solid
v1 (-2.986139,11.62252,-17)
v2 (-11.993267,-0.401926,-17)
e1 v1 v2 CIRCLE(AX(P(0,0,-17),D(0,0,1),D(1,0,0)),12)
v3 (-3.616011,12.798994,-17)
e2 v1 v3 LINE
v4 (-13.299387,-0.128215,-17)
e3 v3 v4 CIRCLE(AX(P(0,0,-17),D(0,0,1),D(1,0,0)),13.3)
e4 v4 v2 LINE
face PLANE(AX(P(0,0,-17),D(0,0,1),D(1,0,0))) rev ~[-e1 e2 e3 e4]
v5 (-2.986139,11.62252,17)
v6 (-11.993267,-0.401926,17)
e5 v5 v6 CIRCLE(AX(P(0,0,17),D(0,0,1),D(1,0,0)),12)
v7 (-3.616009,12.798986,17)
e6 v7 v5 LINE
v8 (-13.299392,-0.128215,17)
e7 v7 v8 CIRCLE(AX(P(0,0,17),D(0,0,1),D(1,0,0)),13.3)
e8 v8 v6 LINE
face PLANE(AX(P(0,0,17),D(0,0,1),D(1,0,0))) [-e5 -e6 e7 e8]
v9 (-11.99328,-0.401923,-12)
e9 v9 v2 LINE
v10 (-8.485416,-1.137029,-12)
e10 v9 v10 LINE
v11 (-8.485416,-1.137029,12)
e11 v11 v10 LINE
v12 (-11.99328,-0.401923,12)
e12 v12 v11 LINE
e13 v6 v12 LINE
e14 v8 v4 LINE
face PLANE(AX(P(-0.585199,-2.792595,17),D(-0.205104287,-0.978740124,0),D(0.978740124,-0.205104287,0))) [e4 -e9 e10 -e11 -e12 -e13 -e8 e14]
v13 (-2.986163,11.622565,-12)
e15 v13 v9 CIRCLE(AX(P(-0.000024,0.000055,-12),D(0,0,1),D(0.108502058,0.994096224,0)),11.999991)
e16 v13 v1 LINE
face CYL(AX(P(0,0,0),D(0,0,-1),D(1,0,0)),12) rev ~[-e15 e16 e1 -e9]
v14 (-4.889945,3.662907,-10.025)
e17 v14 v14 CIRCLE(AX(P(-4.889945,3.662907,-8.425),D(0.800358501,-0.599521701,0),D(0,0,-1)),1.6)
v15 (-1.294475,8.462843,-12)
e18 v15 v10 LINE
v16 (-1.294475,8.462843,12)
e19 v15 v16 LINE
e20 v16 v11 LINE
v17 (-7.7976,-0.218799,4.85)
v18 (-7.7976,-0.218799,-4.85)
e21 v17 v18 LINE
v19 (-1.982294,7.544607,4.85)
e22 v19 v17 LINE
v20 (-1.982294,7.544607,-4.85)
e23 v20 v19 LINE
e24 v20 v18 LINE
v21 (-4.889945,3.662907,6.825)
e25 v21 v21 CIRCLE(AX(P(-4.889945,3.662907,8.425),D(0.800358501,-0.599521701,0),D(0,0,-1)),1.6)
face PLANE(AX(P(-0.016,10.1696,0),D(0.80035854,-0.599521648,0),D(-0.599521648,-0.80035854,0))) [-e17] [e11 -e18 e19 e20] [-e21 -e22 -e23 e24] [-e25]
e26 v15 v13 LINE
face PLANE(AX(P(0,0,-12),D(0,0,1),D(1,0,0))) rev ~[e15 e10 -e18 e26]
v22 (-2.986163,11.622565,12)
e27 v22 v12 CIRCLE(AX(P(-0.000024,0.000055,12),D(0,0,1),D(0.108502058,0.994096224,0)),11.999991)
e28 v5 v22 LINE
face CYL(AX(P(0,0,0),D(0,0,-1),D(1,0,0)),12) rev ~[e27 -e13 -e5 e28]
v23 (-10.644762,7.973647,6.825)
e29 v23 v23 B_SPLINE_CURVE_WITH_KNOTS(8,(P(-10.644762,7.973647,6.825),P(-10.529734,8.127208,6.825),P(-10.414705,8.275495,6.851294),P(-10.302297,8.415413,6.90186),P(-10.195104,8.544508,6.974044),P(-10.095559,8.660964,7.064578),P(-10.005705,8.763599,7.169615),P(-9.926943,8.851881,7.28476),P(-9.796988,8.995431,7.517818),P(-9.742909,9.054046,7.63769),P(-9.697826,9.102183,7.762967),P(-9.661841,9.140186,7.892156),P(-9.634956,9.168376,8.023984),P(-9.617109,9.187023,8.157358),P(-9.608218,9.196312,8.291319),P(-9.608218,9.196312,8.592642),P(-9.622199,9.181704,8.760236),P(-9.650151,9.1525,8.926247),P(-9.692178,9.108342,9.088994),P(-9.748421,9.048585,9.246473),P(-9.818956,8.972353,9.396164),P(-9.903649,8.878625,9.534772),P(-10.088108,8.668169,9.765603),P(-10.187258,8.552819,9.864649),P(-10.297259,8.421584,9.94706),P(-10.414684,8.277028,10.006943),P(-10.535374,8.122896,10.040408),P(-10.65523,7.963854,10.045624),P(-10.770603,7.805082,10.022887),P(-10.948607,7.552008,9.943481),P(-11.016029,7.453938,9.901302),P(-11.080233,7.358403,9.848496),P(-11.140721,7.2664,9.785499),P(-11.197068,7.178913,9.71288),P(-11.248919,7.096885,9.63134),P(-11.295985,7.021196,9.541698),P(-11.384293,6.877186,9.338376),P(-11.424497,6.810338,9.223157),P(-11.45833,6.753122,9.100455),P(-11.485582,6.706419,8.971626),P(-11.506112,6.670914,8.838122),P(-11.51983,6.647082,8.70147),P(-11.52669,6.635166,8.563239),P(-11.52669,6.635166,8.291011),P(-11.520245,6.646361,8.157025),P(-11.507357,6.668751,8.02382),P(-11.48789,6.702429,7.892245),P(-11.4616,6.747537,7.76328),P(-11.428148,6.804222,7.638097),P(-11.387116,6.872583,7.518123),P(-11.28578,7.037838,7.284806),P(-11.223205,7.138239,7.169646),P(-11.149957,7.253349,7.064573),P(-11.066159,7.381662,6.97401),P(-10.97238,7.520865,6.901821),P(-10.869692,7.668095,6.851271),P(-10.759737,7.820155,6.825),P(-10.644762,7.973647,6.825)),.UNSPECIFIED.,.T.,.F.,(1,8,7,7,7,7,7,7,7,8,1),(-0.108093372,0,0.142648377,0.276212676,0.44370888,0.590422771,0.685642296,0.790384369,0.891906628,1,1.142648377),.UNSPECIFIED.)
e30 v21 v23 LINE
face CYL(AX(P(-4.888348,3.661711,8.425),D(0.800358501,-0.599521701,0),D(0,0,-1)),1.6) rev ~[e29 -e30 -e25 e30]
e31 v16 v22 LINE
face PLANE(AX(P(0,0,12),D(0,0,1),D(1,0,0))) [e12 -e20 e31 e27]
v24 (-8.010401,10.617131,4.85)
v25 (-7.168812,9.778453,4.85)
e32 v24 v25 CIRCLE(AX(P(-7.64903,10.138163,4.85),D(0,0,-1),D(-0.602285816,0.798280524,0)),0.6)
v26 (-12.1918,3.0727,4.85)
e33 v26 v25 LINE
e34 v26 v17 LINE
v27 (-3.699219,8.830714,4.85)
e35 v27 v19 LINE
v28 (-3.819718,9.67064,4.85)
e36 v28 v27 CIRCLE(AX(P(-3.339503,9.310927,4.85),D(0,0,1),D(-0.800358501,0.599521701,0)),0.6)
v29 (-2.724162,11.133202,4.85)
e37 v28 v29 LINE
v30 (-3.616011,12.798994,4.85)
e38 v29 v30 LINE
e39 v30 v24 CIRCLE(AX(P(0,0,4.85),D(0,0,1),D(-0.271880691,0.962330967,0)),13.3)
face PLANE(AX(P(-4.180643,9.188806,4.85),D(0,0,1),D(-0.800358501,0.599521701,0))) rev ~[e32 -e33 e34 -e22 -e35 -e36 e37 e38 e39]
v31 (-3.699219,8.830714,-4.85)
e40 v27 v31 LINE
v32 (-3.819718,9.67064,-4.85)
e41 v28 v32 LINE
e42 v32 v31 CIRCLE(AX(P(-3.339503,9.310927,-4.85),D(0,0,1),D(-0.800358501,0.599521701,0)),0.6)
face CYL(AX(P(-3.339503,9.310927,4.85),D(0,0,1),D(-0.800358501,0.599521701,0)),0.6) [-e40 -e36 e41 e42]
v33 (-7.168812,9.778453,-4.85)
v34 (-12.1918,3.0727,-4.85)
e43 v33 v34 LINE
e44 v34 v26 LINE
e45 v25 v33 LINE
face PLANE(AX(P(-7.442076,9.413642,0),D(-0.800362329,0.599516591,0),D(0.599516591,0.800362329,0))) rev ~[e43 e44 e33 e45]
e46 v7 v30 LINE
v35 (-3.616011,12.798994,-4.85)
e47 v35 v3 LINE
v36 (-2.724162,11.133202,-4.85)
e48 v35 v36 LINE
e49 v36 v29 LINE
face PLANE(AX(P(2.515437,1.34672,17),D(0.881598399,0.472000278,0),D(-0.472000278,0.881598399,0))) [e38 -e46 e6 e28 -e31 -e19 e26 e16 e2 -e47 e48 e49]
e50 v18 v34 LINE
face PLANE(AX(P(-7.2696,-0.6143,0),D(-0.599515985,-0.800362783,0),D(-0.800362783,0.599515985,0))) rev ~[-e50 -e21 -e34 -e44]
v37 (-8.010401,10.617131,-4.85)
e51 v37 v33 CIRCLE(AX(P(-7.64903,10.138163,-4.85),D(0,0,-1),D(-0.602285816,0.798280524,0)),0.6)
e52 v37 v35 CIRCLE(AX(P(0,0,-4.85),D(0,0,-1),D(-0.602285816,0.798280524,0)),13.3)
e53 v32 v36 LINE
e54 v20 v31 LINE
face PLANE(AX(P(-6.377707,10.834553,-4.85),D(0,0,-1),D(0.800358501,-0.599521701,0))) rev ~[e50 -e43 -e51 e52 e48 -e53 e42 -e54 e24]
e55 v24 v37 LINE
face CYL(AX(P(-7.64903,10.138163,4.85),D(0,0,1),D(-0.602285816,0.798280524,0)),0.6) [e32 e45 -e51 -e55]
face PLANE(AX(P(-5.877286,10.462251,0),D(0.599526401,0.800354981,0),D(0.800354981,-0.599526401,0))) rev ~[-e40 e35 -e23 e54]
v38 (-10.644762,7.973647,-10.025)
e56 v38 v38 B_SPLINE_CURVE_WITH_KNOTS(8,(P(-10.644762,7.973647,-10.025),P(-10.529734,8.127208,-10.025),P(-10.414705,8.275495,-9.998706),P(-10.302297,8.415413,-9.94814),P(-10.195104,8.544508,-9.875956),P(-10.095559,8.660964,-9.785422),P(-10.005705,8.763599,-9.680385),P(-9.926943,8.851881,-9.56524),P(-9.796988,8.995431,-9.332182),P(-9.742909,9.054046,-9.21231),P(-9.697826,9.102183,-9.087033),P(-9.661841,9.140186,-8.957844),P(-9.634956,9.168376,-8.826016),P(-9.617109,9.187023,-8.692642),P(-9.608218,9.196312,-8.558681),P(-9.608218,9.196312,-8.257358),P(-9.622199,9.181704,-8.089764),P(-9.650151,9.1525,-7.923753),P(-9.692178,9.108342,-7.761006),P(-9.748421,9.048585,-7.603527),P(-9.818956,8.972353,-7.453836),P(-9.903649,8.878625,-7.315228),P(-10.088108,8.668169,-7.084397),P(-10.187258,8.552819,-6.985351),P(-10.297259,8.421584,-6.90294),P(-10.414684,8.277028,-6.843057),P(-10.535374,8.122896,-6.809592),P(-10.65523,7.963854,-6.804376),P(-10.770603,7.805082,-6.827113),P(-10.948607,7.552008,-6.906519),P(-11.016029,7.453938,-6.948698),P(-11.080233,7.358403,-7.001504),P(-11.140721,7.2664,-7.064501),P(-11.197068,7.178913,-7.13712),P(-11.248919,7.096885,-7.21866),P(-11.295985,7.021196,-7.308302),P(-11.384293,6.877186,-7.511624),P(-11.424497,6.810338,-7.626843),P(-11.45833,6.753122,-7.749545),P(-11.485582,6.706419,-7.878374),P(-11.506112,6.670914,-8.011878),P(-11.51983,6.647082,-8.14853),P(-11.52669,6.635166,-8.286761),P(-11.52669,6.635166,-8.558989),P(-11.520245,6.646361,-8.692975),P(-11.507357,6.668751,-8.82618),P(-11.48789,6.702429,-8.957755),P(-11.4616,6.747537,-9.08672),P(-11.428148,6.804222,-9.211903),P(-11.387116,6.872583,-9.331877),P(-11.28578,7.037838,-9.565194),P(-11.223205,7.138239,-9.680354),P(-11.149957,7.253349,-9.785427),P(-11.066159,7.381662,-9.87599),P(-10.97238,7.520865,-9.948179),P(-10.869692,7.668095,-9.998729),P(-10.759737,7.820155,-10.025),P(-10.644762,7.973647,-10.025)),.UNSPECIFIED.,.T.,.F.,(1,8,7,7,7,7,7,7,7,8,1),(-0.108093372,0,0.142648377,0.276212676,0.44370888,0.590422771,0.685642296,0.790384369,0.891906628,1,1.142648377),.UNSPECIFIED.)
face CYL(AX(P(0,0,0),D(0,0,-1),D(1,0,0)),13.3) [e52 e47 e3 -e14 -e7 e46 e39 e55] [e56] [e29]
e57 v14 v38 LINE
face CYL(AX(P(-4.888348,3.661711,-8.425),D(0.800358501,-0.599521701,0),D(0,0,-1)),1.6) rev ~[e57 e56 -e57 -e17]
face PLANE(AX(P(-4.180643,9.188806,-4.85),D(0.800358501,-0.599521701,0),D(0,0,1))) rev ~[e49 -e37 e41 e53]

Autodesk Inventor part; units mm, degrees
ref_plane "YZ Plane" through (0, 0, 0) normal (1, 0, 0) x (0, 1, 0)
ref_plane "XZ Plane" through (0, 0, 0) normal (0, 1, 0) x (-1, 0, 0)
ref_plane "XY Plane" through (0, 0, 0) normal (0, 0, 1) x (1, 0, 0)
sketch "Эскиз1" plane through (0, 0, 0) normal (0, 0, 1) x (1, 0, 0)
  arc A0 (-0.8919, 11.7662) -> (-11.5424, -2.4521) centre (0, 0) ccw projected
  line L0 (-0.016, 10.1696) -> (-9.7639, -2.8438) projected
  line L1 (-9.7639, -2.8438) -> (-12.4663, -6.4515) projected
  arc A1 (-0.8919, 11.7662) -> (-11.5424, -2.4521) centre (0, 0) ccw projected
  line L2 (2.8533, 14) -> (-0.016, 10.1696) projected
  arc A2 (-8.5159, 10.4752) -> (-12.3517, -5.4484) centre (0, 0) ccw projected
  circle A3 centre (0, 0) radius 13.5
  circle A4 centre (0, 0) radius 11.8
  circle A5 centre (0, 0) radius 13.3
  circle A6 centre (0, 0) radius 12
  line L3 (-8.1467, 14) -> (2.8533, 14) projected
  line L4 (-8.1467, 14) -> (-8.1467, 11.2511) projected
  arc A7 (-11.5424, -2.4521) -> (-9.7639, -2.8438) centre (-10.5642, -2.2443) ccw projected
  arc A8 (-0.016, 10.1696) -> (-0.8919, 11.7662) centre (-0.8163, 10.7691) ccw projected
  arc A9 (-8.5159, 10.4752) -> (-8.1467, 11.2511) centre (-9.1467, 11.2511) ccw projected
  arc A10 (-12.4663, -6.4515) -> (-12.3517, -5.4484) centre (-13.2667, -5.852) ccw projected
  arc A11 (-11.5424, -2.4521) -> (-9.7639, -2.8438) centre (-10.5642, -2.2443) ccw projected
  arc A12 (-0.016, 10.1696) -> (-0.8919, 11.7662) centre (-0.8163, 10.7691) ccw projected
  point P0 (1.1623, 11.7426)
  point P1 (2.3273, 13.2979)
  point P2 (-11.0819, -4.6034)
  point P3 (1.302, 11.9292)
  point P4 (2.1926, 13.118)
  point P5 (-11.9725, -5.7923)
  dimension "d1" = 0.2
  dimension "d2" = 0.2
extrude "Выдавливание1" add sketch "Эскиз1" along normal mid plane 34 contours A6 L1 A5 L2 picked at (-9.9488, 8.0267)
sketch "Эскиз2" plane through (0, 0, 0) normal (0, 0, 1) x (1, 0, 0)
  arc A0 (-0.8919, 11.7662) -> (-11.5424, -2.4521) centre (0, 0) ccw projected
  line L0 (-0.016, 10.1696) -> (-9.7639, -2.8438) projected
  arc A1 (1.302, 11.9292) -> (-11.0819, -4.6034) centre (0, 0) ccw projected
  line L1 (-14.5944, -9.2926) -> (2.8533, 14) projected
  arc A2 (-11.5424, -2.4521) -> (-9.7639, -2.8438) centre (-10.5642, -2.2443) ccw projected
  arc A3 (-0.016, 10.1696) -> (-0.8919, 11.7662) centre (-0.8163, 10.7691) ccw projected
  point P0 (1.1623, 11.7426)
  point P1 (-10.9422, -4.4168)
extrude "Выдавливание2" add sketch "Эскиз2" along normal mid plane 24
sketch "Эскиз3" plane through (0, 0, 0) normal (0, 0, 1) x (1, 0, 0)
  arc A0 (1.302, 11.9292) -> (-11.0819, -4.6034) centre (0, 0) ccw projected
  line L0 (-11.0819, -4.6034) -> (1.302, 11.9292) projected
  arc A1 (2.1926, 13.118) -> (-11.9725, -5.7923) centre (0, 0) ccw projected
  arc A2 (-8.5159, 10.4752) -> (-12.3517, -5.4484) centre (0, 0) ccw projected
  line L1 (1.302, 11.9292) -> (-11.0819, -4.6034) projected
  line L2 (-4.8899, 3.6629) -> (-10.8048, 8.0935)
  line L3 (-10.8048, 8.0935) -> (-8.8039, 6.5947)
  line L4 (-11.3519, 3.1932) -> (-6.256, 9.9963)
  line L5 (-6.256, 9.9963) -> (-2.2942, 7.0286)
  line L6 (-2.2942, 7.0286) -> (-7.3901, 0.2256)
  line L7 (-7.3901, 0.2256) -> (-11.3519, 3.1932)
  line L8 (-12.1918, 3.0727) -> (-6.3765, 10.8362)
  line L9 (-6.3765, 10.8362) -> (-1.4543, 7.1491)
  line L10 (-1.4543, 7.1491) -> (-7.2696, -0.6143)
  line L11 (-7.2696, -0.6143) -> (-12.1918, 3.0727)
  point P0 (-4.8422, 3.6271)
  dimension "d7" = 2.5
  dimension "d8" = 8.5
  dimension "d9" = 4.95
  dimension "d12" = 0.6
  dimension "d13" = 9.7
extrude "Выдавливание3" cut sketch "Эскиз3" along normal mid plane 9.7 contours L9 L0 L5 L4 L2 L8 A0 | A0 L8 L9 | L9 L10 L11 L0 L7 L6 L5 | L5 L6 L7 L0 | L0 L2 L4 L5 | L2 L4 L7 L0 L11 A0 L8 | L0 L7 L4 L2 | A0 L11 L8
sketch "Эскиз4" plane through (-1.9823, 7.5446, -4.85) normal (-0.5995217, -0.8003585, 0) x (0.8003585, -0.5995217, 0)
  line L0 (0, 9.7) -> (0, 0) projected
  line L1 (0, 9.7) -> (-5.4903, 9.7) projected
  line L2 (-5.4903, 0) -> (-5.4903, 9.7) projected
  line L3 (-5.4903, 0) -> (0, 0) projected
  line L4 (-5.4903, 9.7) -> (-2.7452, 9.7)
  line L5 (-2.7452, 0) -> (-2.7452, 9.7)
  point P0 (6.1097, 4.85)
extrude "Выдавливание4" cut sketch "Эскиз4" against normal blind 9.7 contours L5 L3 L2 L1
fillet "Сопряжение1" radius 0.6 3 edges at (-5.3836, 12.1617, 0) (-4.1794, 9.1904, 0) (-1.1375, 13.2513, 0)
sketch "Эскиз5" plane through (0, 0, 17) normal (0, 0, 1) x (1, 0, 0)
  arc A0 (2.1926, 13.118) -> (-11.9725, -5.7923) centre (0, 0) ccw projected
  circle A1 centre (0, 0) radius 13.3
  line L0 (2.8533, 17.048) -> (2.8533, 14) projected
  circle A2 centre (0, 0) radius 2.8533
  line L1 (9.8804, -12.4095) -> (-5.8229, 16.921)
  line L2 (0, 0) -> (2.5154, 1.3467)
  line L3 (-19.8346, 1.2413) -> (17.8745, -6.661)
  line L4 (0, 0) -> (-0.5852, -2.7926)
  line L5 (0, 0) -> (-4.8899, 3.6629)
  line L6 (-1.9823, 7.5446) -> (-7.7976, -0.2189) projected
  point P0 (5.4035, -4.0476)
  point P1 (-13.2994, -0.1282)
  point P2 (-11.9725, -5.7923)
  point P3 (8.6469, -10.1055)
  point P4 (12.1289, -5.457)
  point P5 (-3.6161, 12.799)
  dimension "d19" = 115
  dimension "d20" = 115
extrude "Выдавливание5" cut sketch "Эскиз5" against normal blind 40 contours A1 L3 L1 A0 | L3 L1 A1 A0
sketch "Эскиз6" plane through (-8.4854, -1.137, 12) normal (0.8003585, -0.5995217, 0) x (0, 0, -1)
  line L0 (0, 0) -> (24, 0) projected
  line L1 (24, 11.9944) -> (24, 0) projected
  line L2 (24, 11.9944) -> (0, 11.9944) projected
  line L3 (0, 0) -> (0, 11.9944) projected
  line L4 (16.85, 10.8472) -> (16.85, 1.1472) projected
  line L5 (16.85, 1.1472) -> (7.15, 1.1472) projected
  line L6 (7.15, 1.1472) -> (7.15, 10.8472) projected
  line L7 (7.15, 10.8472) -> (16.85, 10.8472) projected
  line L8 (0, 0) -> (0, 11.9944) projected
  line L9 (0, 5.9972) -> (7.15, 5.9972)
  line L10 (7.15, 1.1472) -> (7.15, 10.8472) projected
  line L11 (16.85, 1.1472) -> (16.85, 9.5257) projected
  line L12 (16.85, 5.9972) -> (24, 5.9972)
  circle A0 centre (3.575, 5.9972) radius 1.6
  circle A1 centre (20.425, 5.9972) radius 1.6
  point P0 (12, 5.9972)
  dimension "d23" = 3.2
  dimension "d24" = 3.2
extrude "Выдавливание6" cut sketch "Эскиз6" against normal blind 40 contours A0 L9 | L9 A0 | A1 L12 | L12 A1
properties part number "camera fixator2"
